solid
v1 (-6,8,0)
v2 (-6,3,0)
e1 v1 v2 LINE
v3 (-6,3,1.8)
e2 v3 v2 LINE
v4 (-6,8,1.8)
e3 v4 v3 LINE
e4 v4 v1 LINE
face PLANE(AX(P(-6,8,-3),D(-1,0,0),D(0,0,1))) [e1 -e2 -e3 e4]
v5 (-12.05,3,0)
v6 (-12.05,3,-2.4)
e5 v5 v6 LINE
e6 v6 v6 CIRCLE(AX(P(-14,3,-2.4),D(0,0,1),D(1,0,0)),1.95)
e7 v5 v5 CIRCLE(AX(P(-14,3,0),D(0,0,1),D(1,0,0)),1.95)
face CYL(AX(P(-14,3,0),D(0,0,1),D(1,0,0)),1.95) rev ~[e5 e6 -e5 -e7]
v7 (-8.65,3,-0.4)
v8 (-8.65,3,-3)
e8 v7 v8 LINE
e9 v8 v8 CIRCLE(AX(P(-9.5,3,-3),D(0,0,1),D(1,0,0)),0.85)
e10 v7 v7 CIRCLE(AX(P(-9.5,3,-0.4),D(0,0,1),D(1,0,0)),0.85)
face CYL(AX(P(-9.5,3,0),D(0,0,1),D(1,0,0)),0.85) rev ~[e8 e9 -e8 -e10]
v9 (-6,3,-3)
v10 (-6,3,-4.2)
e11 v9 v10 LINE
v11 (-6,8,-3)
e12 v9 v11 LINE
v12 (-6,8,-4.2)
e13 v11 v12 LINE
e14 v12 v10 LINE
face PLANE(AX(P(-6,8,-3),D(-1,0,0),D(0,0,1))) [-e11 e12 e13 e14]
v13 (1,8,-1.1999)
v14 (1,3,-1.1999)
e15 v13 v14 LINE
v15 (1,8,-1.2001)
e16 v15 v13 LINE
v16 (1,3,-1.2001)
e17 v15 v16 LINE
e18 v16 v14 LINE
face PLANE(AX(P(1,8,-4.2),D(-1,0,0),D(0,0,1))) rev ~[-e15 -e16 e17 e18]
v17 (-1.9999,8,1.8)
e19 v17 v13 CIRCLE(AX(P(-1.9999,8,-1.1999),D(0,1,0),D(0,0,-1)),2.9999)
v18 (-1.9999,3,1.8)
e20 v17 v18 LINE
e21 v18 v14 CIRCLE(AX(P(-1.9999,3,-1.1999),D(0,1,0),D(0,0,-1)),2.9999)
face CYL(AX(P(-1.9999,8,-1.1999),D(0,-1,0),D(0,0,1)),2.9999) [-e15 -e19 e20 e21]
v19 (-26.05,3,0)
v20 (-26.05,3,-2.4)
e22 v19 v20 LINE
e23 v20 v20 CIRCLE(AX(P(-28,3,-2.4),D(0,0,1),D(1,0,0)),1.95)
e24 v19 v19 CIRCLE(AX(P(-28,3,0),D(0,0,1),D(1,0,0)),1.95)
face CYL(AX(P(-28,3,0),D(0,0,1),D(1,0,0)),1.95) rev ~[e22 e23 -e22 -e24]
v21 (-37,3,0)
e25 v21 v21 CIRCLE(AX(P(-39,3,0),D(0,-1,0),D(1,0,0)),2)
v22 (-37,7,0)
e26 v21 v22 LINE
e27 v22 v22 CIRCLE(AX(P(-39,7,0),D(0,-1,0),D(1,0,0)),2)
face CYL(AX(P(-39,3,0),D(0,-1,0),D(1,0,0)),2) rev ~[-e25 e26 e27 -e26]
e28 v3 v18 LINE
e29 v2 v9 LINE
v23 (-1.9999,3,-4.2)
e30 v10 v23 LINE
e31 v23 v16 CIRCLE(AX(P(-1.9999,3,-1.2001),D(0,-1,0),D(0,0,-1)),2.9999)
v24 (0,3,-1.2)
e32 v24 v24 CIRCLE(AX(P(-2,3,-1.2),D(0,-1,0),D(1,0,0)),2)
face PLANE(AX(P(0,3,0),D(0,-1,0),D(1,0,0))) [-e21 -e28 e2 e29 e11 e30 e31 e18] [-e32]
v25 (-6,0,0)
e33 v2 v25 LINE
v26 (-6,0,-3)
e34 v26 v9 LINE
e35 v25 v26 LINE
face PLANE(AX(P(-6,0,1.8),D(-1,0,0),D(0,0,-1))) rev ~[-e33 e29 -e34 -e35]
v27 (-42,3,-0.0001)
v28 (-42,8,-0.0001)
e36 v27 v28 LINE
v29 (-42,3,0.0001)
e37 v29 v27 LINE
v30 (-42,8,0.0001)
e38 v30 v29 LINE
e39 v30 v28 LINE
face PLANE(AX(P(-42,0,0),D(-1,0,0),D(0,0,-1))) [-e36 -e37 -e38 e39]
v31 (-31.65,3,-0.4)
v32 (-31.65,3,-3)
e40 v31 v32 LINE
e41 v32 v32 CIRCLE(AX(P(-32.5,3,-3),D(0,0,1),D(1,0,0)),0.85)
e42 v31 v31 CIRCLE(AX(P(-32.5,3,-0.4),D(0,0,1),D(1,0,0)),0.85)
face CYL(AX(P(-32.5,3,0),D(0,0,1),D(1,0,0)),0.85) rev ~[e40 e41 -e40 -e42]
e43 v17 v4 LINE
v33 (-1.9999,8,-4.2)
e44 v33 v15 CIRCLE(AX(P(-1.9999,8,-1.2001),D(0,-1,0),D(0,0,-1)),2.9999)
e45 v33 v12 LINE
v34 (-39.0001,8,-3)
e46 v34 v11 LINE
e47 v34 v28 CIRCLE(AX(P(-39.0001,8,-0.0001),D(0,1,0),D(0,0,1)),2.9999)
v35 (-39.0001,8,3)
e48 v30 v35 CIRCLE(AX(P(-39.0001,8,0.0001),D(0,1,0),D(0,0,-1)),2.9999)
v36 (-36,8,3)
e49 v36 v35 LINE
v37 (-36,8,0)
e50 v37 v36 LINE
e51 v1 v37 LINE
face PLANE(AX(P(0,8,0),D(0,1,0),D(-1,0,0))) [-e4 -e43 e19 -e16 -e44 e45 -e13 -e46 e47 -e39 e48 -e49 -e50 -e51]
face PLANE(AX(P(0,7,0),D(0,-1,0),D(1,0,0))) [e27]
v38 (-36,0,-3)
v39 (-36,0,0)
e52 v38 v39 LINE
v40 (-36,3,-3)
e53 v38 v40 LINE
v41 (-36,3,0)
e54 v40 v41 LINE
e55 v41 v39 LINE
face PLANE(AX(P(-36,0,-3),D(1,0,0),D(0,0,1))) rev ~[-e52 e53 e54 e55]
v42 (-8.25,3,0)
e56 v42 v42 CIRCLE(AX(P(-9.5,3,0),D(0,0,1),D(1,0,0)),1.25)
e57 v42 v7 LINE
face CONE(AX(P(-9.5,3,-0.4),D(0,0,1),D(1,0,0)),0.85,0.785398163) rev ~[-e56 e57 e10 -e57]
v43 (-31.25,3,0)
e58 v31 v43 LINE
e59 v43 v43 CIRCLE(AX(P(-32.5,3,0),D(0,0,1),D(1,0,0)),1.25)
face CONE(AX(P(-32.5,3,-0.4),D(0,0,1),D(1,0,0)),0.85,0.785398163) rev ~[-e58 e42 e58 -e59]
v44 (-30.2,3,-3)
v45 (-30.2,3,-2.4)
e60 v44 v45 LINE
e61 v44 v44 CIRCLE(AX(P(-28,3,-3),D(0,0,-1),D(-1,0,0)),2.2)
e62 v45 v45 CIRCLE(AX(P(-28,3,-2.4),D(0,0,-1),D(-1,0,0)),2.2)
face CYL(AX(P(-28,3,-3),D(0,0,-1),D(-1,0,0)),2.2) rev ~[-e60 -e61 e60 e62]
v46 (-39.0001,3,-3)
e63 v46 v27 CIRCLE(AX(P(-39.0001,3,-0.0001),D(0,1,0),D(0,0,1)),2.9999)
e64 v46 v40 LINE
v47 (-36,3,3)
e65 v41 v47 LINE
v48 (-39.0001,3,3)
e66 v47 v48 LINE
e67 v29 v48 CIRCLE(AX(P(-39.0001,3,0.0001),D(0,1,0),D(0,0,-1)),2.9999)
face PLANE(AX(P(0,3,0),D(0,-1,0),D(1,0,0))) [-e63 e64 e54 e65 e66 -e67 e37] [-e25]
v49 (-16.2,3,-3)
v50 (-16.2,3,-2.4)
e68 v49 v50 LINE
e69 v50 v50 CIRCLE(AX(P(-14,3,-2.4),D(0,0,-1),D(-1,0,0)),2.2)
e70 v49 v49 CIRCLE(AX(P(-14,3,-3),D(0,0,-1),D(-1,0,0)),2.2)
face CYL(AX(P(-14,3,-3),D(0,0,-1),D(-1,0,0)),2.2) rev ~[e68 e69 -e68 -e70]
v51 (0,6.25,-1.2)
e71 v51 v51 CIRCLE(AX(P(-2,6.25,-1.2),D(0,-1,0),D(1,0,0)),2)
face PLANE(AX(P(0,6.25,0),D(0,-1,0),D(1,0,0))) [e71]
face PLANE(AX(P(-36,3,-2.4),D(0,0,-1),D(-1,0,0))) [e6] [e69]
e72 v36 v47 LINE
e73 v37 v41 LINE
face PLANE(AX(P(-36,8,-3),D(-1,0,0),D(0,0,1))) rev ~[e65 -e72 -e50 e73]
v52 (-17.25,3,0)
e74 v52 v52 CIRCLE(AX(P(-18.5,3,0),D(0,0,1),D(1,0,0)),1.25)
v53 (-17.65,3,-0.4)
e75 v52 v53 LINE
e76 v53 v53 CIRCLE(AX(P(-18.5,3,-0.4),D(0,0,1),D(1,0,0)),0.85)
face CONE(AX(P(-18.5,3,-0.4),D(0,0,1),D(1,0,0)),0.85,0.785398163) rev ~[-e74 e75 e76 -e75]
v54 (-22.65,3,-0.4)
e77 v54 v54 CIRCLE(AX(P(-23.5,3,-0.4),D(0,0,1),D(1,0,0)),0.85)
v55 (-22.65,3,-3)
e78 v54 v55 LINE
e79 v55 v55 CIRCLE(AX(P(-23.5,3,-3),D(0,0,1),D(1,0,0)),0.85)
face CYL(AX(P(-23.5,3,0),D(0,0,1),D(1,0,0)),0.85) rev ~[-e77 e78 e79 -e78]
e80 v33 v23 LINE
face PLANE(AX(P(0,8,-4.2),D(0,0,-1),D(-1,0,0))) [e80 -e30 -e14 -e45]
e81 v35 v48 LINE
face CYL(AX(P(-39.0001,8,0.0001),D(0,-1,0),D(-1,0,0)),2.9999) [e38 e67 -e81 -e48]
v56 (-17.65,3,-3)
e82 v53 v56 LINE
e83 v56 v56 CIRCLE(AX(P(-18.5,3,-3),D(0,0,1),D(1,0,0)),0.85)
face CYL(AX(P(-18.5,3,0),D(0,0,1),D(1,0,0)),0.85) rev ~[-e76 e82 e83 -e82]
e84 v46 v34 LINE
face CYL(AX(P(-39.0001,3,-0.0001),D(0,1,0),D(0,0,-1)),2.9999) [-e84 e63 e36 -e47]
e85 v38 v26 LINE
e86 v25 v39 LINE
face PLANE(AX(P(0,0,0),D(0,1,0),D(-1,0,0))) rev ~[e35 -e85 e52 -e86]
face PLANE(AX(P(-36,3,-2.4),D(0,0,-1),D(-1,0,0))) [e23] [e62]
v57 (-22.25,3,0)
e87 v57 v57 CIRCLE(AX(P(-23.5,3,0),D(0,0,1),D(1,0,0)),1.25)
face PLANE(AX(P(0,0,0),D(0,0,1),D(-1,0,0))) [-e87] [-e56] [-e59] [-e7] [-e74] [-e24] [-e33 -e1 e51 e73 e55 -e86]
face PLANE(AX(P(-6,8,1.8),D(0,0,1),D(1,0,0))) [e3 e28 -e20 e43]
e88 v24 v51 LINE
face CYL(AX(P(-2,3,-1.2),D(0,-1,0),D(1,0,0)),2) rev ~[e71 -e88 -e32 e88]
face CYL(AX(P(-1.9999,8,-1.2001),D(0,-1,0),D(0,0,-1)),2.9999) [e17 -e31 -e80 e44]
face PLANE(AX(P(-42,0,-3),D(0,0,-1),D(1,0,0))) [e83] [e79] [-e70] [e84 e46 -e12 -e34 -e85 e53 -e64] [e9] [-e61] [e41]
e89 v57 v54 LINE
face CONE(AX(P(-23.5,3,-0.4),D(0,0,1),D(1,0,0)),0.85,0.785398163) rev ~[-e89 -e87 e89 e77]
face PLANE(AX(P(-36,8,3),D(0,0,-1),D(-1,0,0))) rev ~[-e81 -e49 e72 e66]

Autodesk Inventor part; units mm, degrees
ref_plane "YZ Plane" through (0, 0, 0) normal (1, 0, 0) x (0, 1, 0)
ref_plane "XZ Plane" through (0, 0, 0) normal (0, 1, 0) x (-1, 0, 0)
ref_plane "XY Plane" through (0, 0, 0) normal (0, 0, 1) x (1, 0, 0)
sketch "Szkic1" plane through (0, 0, 0) normal (0, 1, 0) x (-1, 0, 0)
  line L0 (0, 0) -> (42, 0)
  line L1 (42, 0) -> (42, -3)
  line L2 (42, -3) -> (0, -3)
  line L3 (0, -3) -> (0, 0)
  dimension "d0" = 42
  dimension "d1" = 3
extrude "Wyciągnięcie proste1" add sketch "Szkic1" along normal blind 8
sketch "Szkic2" plane through (0, 8, 0) normal (0, 1, 0) x (1, 0, 0)
  circle A0 centre (-38.7043, 1.357) radius 1
  point P0 (0, 0)
  dimension "d4" = 2
extrude "Wyciągnięcie proste2" cut sketch "Szkic2" against normal blind 0.2
sketch "Szkic3" plane through (-42, 0, 0) normal (0, 0, 1) x (1, 0, 0)
  line L0 (0, 8) -> (42, 8) projected
  line L1 (0, 8) -> (6, 8)
  line L2 (6, 0) -> (0, 0)
  line L3 (0, 0) -> (0, 8)
  line L4 (42, 0) -> (36, 0)
  line L5 (36, 8) -> (42, 8)
  line L6 (42, 8) -> (42, 0)
  circle A0 centre (9.5, 3) radius 0.85
  line L7 (0, 0) -> (42, 0) projected
  circle A1 centre (18.5, 3) radius 0.85
  circle A2 centre (23.5, 3) radius 0.85
  circle A3 centre (32.5, 3) radius 0.85
  circle A4 centre (14, 3) radius 1.95
  circle A5 centre (28, 3) radius 1.95
  dimension "d7" = 6
  dimension "d8" = 8
  dimension "d9" = 6
  dimension "d10" = 1.7
  dimension "d11" = 3
  dimension "d12" = 1.7
  dimension "d13" = 1.7
  dimension "d14" = 1.7
  dimension "d15" = 3
  dimension "d16" = 3
  dimension "d17" = 3
  dimension "d18" = 9.5
  dimension "d19" = 9.5
  dimension "d20" = 9
  dimension "d21" = 9
  dimension "d22" = 3.9
  dimension "d23" = 3.9
  dimension "d24" = 3
  dimension "d25" = 4.5
  dimension "d26" = 4.5
  dimension "d27" = 3
extrude "Wyciągnięcie proste3" cut sketch "Szkic3" against normal blind 3 contours A0 | A1 | A2 | A3 | A4 | A5
sketch "Szkic4" plane through (0, 8, 0) normal (0, 1, 0) x (1, 0, 0)
  line L0 (0, 3) -> (-42, 3) projected
  line L1 (-42, 3) -> (-36, 3)
  line L2 (-36, 3) -> (-36, -3)
  line L3 (-36, -3) -> (-42, -3)
  line L4 (-42, -3) -> (-42, 3)
  point P0 (0, 0)
  dimension "d30" = 6
  dimension "d31" = 6
extrude "Wyciągnięcie proste4" add sketch "Szkic4" against normal blind 8
sketch "Szkic5" plane through (0, 0, 0) normal (0, -1, 0) x (1, 0, 0)
  line L0 (-36, 3) -> (-42, 3) projected
  line L1 (-42, -3) -> (-36, -3)
  line L2 (-36, -3) -> (-36, 3)
  line L3 (-36, 3) -> (-42, 3)
  line L4 (-42, 3) -> (-42, -3)
  point P0 (0, 0)
extrude "Wyciągnięcie proste5" cut sketch "Szkic5" against normal blind 3
sketch "Szkic6" plane through (0, 3, 0) normal (0, -1, 0) x (1, 0, 0)
  circle A0 centre (-39, 0) radius 2
  line L0 (-42, 3) -> (-36, 3) projected
  line L1 (-42, -3) -> (-42, 3) projected
  point P0 (0, 0)
  point P1 (-42, 0)
  dimension "d36" = 4
  dimension "d37" = 3
  dimension "d38" = 3
extrude "Wyciągnięcie proste6" cut sketch "Szkic6" against normal blind 4
sketch "Szkic10" plane through (0, 8, 0) normal (0, 1, 0) x (1, 0, 0)
  line L0 (0, 3) -> (-36, 3) projected
  line L1 (0, 3) -> (-6, 3)
  line L2 (-6, 3) -> (-6, -1.8)
  line L3 (-6, -1.8) -> (0, -1.8)
  line L4 (0, -1.8) -> (0, 3)
  line L5 (-6, 3) -> (0, 3)
  line L6 (0, 3) -> (0, 4.2)
  line L7 (0, 4.2) -> (-6, 4.2)
  line L8 (-6, 4.2) -> (-6, 3)
  line L9 (0, 4.2) -> (1, 4.2)
  line L10 (1, 4.2) -> (1, -1.8)
  line L11 (1, -1.8) -> (0, -1.8)
  line L12 (0, -1.8) -> (0, 4.2)
  point P0 (0, 0)
  dimension "d55" = 6
  dimension "d56" = 4.8
  dimension "d57" = 1.2
  dimension "d58" = 1
extrude "Wyciągnięcie proste10" add sketch "Szkic10" against normal blind 8
sketch "Szkic11" plane through (0, 0, 0) normal (0, -1, 0) x (1, 0, 0)
  line L0 (-6, 1.8) -> (1, 1.8) projected
  line L1 (-6, -3) -> (-6, -4.2) projected
  line L2 (1, 1.8) -> (-6, 1.8)
  line L3 (-6, 1.8) -> (-6, -4.2)
  line L4 (-6, -4.2) -> (1, -4.2)
  line L5 (1, -4.2) -> (1, 1.8)
  point P0 (0, 0)
extrude "Wyciągnięcie proste11" cut sketch "Szkic11" against normal blind 3
sketch "Szkic12" plane through (0, 3, 0) normal (0, -1, 0) x (1, 0, 0)
  circle A0 centre (-2, -1.2) radius 2
  line L0 (1, 1.8) -> (1, -4.2) projected
  line L1 (-6, -3) -> (-6, 0) projected
  line L2 (-6, 1.8) -> (1, 1.8) projected
  point P0 (0, 0)
  point P1 (1, -1.2)
  point P2 (-6, -1.5)
  dimension "d63" = 4
  dimension "d64" = 3
  dimension "d65" = 4
  dimension "d66" = 3
extrude "Wyciągnięcie proste12" cut sketch "Szkic12" against normal blind 3.25
sketch "Szkic14" plane through (-36, 3, -3) normal (0, 0, -1) x (-1, 0, 0)
  circle A0 centre (-22, 0) radius 1.95 projected
  circle A1 centre (-22, 0) radius 2.2
  circle A2 centre (-8, 0) radius 1.95 projected
  circle A3 centre (-8, 0) radius 2.2
  point P0 (-36, -3)
  dimension "d73" = 4.4
  dimension "d74" = 4.4
extrude "Wyciągnięcie proste14" cut sketch "Szkic14" against normal blind 0.6 contours A0 | A1 | A2 | A3
fillet "Fillet1" radius 3 4 edges at (1, 5.5, -4.2) (1, 5.5, 1.8) (-42, 5.5, -3) (-42, 5.5, 3)
chamfer "Chamfer1" distance 0.4 angle 45 1 edges at (-33.35, 3, 0)
chamfer "Chamfer2" distance 0.4 angle 45 3 edges at (-24.35, 3, 0) (-19.35, 3, 0) (-10.35, 3, 0)
properties part number "lmwall" material "Tworzywo sztuczne PET"
